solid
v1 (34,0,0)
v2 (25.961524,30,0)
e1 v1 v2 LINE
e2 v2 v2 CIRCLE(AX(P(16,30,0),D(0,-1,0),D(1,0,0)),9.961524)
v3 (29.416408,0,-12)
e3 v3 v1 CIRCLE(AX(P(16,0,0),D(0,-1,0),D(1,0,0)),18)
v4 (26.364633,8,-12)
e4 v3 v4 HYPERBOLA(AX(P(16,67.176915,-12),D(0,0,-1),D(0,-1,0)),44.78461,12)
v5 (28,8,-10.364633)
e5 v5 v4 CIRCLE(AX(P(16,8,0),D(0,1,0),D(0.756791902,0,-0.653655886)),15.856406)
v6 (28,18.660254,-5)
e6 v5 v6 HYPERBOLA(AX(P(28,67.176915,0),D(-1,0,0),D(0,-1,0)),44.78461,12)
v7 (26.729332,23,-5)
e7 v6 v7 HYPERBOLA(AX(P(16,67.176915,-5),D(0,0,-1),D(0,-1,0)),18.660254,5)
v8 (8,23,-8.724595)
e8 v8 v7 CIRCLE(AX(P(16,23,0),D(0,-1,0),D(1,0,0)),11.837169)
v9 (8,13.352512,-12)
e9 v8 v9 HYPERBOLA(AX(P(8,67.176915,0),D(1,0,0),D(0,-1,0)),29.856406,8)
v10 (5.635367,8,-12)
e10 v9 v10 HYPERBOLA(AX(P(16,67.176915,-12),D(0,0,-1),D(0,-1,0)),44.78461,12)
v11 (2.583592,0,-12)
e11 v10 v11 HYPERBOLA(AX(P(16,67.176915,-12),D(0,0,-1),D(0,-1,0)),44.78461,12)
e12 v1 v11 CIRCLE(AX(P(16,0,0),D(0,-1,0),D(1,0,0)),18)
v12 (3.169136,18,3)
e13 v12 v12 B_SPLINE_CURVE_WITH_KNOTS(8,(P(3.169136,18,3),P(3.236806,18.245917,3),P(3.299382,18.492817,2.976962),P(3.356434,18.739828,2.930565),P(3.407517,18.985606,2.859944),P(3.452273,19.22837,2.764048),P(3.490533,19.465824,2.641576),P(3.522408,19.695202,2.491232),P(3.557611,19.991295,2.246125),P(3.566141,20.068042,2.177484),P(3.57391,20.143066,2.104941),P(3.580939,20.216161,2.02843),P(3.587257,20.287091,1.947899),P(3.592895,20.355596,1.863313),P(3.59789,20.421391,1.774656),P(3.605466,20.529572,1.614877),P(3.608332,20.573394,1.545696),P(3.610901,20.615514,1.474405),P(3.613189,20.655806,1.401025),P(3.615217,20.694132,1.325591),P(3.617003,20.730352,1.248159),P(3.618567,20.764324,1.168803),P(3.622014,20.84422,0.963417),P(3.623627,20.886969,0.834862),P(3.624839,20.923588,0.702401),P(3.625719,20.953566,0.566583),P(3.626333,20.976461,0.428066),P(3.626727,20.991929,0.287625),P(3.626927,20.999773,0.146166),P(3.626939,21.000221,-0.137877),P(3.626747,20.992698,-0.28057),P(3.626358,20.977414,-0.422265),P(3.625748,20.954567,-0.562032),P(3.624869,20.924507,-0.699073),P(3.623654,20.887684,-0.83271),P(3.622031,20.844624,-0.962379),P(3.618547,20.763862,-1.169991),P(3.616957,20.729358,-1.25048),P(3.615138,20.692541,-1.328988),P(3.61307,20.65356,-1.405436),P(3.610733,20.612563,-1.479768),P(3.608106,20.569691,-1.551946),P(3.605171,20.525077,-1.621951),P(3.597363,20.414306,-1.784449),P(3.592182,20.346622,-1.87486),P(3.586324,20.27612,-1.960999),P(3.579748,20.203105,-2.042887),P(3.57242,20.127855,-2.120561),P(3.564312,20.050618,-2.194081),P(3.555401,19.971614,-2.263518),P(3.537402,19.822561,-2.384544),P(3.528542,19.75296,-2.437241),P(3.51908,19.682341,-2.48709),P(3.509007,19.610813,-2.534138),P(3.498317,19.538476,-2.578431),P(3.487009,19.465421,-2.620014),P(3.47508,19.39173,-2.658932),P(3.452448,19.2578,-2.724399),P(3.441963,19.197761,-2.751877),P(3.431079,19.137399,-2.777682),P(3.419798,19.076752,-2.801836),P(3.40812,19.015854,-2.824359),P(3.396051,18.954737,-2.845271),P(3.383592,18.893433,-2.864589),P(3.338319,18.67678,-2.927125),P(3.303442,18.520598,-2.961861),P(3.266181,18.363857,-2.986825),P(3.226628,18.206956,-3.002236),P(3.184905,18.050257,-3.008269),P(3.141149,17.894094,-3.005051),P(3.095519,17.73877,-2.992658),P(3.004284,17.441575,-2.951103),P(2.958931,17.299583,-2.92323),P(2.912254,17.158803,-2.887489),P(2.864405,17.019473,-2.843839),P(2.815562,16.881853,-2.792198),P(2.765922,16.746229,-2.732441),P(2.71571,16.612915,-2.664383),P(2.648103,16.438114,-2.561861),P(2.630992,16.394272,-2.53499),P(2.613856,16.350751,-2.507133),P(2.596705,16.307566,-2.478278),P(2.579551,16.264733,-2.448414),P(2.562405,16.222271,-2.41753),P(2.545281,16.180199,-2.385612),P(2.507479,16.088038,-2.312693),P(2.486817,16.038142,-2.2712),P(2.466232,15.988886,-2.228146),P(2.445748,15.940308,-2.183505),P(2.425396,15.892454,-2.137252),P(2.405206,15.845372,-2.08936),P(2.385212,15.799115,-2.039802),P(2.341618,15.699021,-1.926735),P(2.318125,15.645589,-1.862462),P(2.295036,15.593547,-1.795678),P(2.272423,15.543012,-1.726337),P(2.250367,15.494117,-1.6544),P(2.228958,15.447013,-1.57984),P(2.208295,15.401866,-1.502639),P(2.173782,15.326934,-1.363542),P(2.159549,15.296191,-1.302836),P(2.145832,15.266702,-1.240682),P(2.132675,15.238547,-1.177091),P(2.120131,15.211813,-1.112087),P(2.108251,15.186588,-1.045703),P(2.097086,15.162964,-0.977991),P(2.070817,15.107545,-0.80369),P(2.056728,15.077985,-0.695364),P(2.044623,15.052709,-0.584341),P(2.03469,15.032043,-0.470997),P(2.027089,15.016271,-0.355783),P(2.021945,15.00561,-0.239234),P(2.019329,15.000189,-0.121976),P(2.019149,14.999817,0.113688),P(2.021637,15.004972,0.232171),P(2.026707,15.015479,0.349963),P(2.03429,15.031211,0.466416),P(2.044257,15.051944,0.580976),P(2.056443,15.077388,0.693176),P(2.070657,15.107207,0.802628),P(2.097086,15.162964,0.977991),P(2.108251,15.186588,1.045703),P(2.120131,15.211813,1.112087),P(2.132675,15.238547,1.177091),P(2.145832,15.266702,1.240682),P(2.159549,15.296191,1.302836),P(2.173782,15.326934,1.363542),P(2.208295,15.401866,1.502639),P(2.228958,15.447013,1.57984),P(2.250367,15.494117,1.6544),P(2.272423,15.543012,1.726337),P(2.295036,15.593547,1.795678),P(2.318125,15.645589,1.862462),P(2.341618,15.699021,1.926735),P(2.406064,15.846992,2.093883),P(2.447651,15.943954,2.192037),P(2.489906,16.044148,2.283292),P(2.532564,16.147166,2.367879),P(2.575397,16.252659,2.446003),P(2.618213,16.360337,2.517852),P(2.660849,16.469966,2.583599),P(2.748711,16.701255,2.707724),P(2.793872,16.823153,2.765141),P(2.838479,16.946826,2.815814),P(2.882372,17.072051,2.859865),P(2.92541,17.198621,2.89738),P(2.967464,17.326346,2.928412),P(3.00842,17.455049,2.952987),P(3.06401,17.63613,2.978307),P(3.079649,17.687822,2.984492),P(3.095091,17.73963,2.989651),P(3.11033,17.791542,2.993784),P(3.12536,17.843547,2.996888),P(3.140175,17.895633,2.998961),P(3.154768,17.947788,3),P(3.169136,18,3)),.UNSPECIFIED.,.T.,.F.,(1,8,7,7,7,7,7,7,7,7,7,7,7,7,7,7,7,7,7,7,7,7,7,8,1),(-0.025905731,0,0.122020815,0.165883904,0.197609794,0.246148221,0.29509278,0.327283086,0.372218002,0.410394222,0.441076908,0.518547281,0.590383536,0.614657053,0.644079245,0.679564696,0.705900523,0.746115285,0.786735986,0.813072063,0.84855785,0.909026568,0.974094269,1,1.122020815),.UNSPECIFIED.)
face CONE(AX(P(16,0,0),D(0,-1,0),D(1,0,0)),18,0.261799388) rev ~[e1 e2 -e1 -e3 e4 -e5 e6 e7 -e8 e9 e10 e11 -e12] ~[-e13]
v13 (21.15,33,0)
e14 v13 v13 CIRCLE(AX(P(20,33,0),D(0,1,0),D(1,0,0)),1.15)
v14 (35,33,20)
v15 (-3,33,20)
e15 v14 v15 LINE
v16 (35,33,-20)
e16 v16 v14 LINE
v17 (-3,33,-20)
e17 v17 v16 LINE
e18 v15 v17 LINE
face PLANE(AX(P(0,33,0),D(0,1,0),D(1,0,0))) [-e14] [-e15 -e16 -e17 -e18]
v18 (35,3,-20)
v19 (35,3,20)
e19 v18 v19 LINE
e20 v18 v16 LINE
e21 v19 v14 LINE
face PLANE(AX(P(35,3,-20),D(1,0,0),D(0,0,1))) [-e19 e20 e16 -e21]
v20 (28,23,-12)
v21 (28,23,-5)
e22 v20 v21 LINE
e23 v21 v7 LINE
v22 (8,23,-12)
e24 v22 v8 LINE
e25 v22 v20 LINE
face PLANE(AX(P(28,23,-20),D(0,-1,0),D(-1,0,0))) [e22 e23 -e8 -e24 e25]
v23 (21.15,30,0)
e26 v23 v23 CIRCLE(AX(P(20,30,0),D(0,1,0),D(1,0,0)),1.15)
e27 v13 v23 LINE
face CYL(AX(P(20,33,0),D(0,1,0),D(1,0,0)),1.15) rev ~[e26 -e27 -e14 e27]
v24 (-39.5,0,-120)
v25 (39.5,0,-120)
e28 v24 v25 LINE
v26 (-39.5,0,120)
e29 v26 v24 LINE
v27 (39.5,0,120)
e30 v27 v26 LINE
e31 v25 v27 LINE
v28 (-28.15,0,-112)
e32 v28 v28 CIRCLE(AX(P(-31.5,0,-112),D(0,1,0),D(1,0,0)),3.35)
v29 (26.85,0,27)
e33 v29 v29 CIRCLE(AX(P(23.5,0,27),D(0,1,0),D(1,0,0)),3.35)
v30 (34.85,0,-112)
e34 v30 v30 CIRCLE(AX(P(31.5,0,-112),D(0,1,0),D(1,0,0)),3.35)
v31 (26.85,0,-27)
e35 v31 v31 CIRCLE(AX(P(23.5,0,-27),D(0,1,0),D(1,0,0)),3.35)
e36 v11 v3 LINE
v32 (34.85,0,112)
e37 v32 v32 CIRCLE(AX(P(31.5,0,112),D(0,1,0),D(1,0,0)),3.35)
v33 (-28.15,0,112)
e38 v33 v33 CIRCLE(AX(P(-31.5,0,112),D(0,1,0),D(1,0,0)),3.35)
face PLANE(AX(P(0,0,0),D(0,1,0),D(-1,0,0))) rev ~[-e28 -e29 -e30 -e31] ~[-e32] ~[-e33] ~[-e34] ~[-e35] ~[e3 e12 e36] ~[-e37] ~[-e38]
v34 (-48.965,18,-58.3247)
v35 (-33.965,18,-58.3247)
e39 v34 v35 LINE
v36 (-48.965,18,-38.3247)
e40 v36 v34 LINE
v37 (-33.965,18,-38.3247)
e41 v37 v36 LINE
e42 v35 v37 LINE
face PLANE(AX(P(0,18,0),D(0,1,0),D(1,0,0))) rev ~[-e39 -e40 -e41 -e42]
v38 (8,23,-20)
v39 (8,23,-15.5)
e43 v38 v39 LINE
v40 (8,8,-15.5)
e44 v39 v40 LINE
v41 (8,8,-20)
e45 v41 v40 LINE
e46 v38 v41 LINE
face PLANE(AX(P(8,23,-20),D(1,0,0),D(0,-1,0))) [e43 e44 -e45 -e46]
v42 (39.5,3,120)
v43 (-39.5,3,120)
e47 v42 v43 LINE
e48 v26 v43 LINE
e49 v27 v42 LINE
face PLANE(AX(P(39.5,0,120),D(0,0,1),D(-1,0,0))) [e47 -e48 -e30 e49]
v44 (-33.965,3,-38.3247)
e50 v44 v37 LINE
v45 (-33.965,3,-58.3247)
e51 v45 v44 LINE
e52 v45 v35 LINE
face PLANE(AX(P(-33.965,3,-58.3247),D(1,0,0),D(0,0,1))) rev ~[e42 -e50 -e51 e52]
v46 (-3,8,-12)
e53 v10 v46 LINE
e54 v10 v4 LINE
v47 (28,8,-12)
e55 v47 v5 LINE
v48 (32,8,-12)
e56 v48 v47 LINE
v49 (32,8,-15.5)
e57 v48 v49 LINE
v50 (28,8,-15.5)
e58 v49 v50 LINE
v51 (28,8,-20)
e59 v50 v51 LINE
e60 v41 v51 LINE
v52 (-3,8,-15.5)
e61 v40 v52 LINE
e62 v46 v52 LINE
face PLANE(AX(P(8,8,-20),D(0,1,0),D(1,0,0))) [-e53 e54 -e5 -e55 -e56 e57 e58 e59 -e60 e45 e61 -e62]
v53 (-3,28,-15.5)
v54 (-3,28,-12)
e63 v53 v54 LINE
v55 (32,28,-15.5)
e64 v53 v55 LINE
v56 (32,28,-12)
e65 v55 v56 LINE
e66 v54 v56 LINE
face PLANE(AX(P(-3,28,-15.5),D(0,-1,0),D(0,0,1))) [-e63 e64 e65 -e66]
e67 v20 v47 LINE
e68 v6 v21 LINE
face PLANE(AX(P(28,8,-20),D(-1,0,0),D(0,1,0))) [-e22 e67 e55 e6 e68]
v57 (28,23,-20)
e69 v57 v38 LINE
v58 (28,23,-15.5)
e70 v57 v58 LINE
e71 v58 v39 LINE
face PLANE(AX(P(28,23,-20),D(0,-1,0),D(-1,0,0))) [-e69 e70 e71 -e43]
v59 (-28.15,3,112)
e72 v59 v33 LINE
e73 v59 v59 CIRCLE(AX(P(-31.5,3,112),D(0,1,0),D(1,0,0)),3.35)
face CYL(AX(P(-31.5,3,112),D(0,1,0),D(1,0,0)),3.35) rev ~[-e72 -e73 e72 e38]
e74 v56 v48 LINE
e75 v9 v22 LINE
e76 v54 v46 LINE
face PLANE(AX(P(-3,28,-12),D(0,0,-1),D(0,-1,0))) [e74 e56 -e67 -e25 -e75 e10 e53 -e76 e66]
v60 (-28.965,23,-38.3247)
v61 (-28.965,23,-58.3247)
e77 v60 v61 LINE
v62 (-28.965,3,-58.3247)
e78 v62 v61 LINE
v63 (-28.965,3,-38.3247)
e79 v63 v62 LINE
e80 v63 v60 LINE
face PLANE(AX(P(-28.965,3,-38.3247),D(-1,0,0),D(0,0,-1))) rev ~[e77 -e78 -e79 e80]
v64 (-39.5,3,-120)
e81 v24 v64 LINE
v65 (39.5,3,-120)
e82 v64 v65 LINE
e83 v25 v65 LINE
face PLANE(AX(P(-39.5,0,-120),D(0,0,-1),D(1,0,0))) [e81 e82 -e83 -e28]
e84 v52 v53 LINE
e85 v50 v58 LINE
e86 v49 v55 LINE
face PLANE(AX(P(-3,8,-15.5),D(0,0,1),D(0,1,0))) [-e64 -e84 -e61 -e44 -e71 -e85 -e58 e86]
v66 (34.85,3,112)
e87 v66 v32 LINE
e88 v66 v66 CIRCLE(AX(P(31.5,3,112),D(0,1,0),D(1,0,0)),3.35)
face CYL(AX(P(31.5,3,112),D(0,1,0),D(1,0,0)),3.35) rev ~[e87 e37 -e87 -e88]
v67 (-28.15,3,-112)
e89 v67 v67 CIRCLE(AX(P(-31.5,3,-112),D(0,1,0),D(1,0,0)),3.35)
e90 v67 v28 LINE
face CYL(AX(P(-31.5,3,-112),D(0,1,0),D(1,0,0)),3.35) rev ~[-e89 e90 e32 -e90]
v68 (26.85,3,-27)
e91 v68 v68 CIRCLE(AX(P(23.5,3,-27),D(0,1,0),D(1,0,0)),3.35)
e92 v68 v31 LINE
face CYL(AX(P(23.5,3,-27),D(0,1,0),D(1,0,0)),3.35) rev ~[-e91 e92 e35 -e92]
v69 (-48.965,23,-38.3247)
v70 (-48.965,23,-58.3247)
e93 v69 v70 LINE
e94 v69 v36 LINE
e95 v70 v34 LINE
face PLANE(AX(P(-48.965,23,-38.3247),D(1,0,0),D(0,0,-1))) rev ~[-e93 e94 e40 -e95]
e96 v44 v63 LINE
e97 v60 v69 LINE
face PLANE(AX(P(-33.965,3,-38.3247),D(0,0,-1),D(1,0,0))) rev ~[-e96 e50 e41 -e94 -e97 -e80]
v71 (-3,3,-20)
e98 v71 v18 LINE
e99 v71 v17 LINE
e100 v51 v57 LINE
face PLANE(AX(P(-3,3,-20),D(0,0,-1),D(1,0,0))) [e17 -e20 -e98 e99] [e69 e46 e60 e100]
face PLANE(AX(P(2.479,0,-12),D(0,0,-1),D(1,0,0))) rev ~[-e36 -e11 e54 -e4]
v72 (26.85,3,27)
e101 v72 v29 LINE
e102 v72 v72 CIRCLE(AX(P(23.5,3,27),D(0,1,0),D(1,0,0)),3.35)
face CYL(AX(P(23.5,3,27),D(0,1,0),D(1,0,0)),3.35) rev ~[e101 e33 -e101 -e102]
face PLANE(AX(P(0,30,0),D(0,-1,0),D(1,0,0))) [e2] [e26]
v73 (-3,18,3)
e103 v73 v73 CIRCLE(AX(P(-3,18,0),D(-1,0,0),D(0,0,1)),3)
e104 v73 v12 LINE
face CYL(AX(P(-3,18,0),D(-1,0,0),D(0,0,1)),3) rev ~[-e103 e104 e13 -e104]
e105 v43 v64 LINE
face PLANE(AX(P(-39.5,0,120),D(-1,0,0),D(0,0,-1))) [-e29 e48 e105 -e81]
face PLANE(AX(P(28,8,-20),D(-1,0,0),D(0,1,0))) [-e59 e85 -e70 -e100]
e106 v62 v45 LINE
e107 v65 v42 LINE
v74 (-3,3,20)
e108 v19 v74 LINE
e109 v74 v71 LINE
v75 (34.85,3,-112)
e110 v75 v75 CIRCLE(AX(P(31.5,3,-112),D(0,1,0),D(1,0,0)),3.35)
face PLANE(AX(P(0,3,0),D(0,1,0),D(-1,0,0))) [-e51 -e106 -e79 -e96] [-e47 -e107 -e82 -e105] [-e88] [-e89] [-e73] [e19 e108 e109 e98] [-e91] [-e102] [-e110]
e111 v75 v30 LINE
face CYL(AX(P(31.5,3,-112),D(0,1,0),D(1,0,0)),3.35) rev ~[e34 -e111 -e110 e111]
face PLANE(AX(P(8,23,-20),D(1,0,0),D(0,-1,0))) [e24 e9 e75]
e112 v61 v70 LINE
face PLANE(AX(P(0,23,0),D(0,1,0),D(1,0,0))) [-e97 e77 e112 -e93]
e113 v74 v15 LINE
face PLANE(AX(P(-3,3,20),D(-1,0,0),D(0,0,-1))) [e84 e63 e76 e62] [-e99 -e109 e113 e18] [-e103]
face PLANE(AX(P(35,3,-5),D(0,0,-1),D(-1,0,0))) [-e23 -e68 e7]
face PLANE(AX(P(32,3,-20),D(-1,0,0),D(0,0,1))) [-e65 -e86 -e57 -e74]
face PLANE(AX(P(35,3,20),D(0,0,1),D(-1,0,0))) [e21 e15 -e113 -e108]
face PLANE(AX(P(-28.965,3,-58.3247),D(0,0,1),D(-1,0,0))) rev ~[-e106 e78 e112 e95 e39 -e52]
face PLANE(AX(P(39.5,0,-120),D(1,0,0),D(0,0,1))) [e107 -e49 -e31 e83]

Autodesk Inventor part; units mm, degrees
ref_plane "YZ Plane" through (0, 0, 0) normal (1, 0, 0) x (0, 1, 0)
ref_plane "XZ Plane" through (0, 0, 0) normal (0, 1, 0) x (-1, 0, 0)
ref_plane "XY Plane" through (0, 0, 0) normal (0, 0, 1) x (1, 0, 0)
sketch "Sketch44" plane through (0, 0, 0) normal (0, 1, 0) x (-1, 0, 0)
  line L0 (-39.5, 120) -> (39.5, 120)
  line L1 (39.5, 120) -> (39.5, -120)
  line L2 (39.5, -120) -> (-39.5, -120)
  line L3 (-39.5, -120) -> (-39.5, 120)
  line L4 (-39.5, 120) -> (39.5, -120) construction
  line L5 (39.5, 120) -> (-39.5, -120) construction
  point P0 (0, 0)
  dimension "d138" = 79
  dimension "d139" = 240
extrude "Extrusion33" add sketch "Sketch44" along normal blind 3
sketch "Sketch45" plane through (0, 3, 0) normal (0, 1, 0) x (1, 0, 0)
  line L0 (35, -20) -> (-3, -20)
  line L1 (-3, -20) -> (-3, 20)
  line L2 (-3, 20) -> (35, 20)
  line L3 (35, 20) -> (35, -20)
  point P0 (0, 0)
  dimension "d142" = 38
  dimension "d143" = 40
extrude "Extrusion34" add sketch "Sketch45" along normal blind 30
sketch "Sketch47" plane through (0, 0, 0) normal (0, -1, 0) x (1, 0, 0)
  circle A0 centre (16, 0) radius 18
  point P0 (0, 0)
  dimension "d146" = 36
extrude "Extrusion35" cut sketch "Sketch47" against normal blind 30 draft -15
sketch "Sketch58" plane through (35, 3, -20) normal (0, 0, -1) x (-1, 0, 0)
  line L0 (7, 20) -> (27, 20)
  line L1 (27, 20) -> (27, 5)
  line L2 (27, 5) -> (7, 5)
  line L3 (7, 5) -> (7, 20)
  point P0 (35, -3)
  dimension "d156" = 20
  dimension "d157" = 15
extrude "Extrusion38" cut sketch "Sketch58" against normal blind 15
sketch "Sketch59" plane through (-3, 3, -20) normal (-1, 0, 0) x (0, 0, 1)
  line L0 (4.5, 25) -> (8, 25)
  line L1 (8, 25) -> (8, 5)
  line L2 (8, 5) -> (4.5, 5)
  line L3 (4.5, 5) -> (4.5, 25)
  point P0 (20, -3)
  dimension "d160" = 3.5
  dimension "d161" = 20
extrude "Extrusion39" cut sketch "Sketch59" against normal blind 35
sketch "Sketch60" plane through (0, 3, 0) normal (0, 1, 0) x (1, 0, 0)
  line L0 (-33.965, 38.3247) -> (-28.965, 38.3247)
  line L1 (-28.965, 38.3247) -> (-28.965, 58.3247)
  line L2 (-28.965, 58.3247) -> (-33.965, 58.3247)
  line L3 (-33.965, 58.3247) -> (-33.965, 38.3247)
  point P0 (0, 0)
  dimension "d164" = 5
  dimension "d165" = 20
extrude "Extrusion40" add sketch "Sketch60" along normal blind 20
sketch "Sketch61" plane through (0, 23, 0) normal (0, 1, 0) x (1, 0, 0)
  line L0 (-28.965, 38.3247) -> (-28.965, 58.3247) projected
  line L1 (-28.965, 38.3247) -> (-48.965, 38.3247)
  line L2 (-48.965, 38.3247) -> (-48.965, 58.3247)
  line L3 (-48.965, 58.3247) -> (-28.965, 58.3247)
  line L4 (-28.965, 58.3247) -> (-28.965, 38.3247)
  point P0 (0, 0)
  dimension "d168" = 20
  dimension "d169" = 20
extrude "Extrusion41" add sketch "Sketch61" against normal blind 5
sketch "Sketch65" plane through (-3, 3, -20) normal (-1, 0, 0) x (0, 0, 1)
  circle A0 centre (20, 15) radius 3
  point P0 (20, -3)
  dimension "d176" = 6
extrude "Extrusion43" cut sketch "Sketch65" against normal blind 10
sketch "Sketch68" plane through (0, 3, 0) normal (0, 1, 0) x (1, 0, 0)
  circle A0 centre (-31.5, -112) radius 3.35
  circle A1 centre (31.5, -112) radius 3.35
  circle A2 centre (-31.5, 112) radius 3.35
  circle A3 centre (31.5, 112) radius 3.35
  point P0 (0, 0)
  dimension "d192" = 6.7
  dimension "d193" = 6.7
  dimension "d194" = 6.7
  dimension "d195" = 6.7
extrude "Extrusion46" cut sketch "Sketch68" against normal through all
sketch "Sketch69" plane through (0, 3, 0) normal (0, 1, 0) x (1, 0, 0)
  circle A0 centre (23.5, -27) radius 3.35
  circle A1 centre (23.5, 27) radius 3.35
  point P0 (0, 0)
  dimension "d198" = 6.7
  dimension "d199" = 6.7
extrude "Extrusion47" cut sketch "Sketch69" against normal through all
sketch "Sketch70" plane through (0, 0, 0) normal (0, -1, 0) x (1, 0, 0)
  line L0 (-3, -12) -> (32, -12) projected
  line L1 (2.479, -12) -> (29.6644, -12)
  line L2 (29.6644, -12) -> (29.6644, -18.105)
  line L3 (29.6644, -18.105) -> (2.479, -18.105)
  line L4 (2.479, -18.105) -> (2.479, -12)
  point P0 (0, 0)
extrude "Extrusion48" add sketch "Sketch70" against normal blind 8
sketch "Sketch74" plane through (0, 33, 0) normal (0, 1, 0) x (1, 0, 0)
  circle A0 centre (20, 0) radius 1.15
  point P0 (0, 0)
  dimension "d210" = 2.3
extrude "Extrusion51" cut sketch "Sketch74" against normal blind 10
equation "\"d193\" = d192"
equation "\"d194\" = d192"
equation "\"d195\" = d192"
equation "\"d198\" = d192"
equation "\"d199\" = d192"
properties part number "liquid port_v10"
